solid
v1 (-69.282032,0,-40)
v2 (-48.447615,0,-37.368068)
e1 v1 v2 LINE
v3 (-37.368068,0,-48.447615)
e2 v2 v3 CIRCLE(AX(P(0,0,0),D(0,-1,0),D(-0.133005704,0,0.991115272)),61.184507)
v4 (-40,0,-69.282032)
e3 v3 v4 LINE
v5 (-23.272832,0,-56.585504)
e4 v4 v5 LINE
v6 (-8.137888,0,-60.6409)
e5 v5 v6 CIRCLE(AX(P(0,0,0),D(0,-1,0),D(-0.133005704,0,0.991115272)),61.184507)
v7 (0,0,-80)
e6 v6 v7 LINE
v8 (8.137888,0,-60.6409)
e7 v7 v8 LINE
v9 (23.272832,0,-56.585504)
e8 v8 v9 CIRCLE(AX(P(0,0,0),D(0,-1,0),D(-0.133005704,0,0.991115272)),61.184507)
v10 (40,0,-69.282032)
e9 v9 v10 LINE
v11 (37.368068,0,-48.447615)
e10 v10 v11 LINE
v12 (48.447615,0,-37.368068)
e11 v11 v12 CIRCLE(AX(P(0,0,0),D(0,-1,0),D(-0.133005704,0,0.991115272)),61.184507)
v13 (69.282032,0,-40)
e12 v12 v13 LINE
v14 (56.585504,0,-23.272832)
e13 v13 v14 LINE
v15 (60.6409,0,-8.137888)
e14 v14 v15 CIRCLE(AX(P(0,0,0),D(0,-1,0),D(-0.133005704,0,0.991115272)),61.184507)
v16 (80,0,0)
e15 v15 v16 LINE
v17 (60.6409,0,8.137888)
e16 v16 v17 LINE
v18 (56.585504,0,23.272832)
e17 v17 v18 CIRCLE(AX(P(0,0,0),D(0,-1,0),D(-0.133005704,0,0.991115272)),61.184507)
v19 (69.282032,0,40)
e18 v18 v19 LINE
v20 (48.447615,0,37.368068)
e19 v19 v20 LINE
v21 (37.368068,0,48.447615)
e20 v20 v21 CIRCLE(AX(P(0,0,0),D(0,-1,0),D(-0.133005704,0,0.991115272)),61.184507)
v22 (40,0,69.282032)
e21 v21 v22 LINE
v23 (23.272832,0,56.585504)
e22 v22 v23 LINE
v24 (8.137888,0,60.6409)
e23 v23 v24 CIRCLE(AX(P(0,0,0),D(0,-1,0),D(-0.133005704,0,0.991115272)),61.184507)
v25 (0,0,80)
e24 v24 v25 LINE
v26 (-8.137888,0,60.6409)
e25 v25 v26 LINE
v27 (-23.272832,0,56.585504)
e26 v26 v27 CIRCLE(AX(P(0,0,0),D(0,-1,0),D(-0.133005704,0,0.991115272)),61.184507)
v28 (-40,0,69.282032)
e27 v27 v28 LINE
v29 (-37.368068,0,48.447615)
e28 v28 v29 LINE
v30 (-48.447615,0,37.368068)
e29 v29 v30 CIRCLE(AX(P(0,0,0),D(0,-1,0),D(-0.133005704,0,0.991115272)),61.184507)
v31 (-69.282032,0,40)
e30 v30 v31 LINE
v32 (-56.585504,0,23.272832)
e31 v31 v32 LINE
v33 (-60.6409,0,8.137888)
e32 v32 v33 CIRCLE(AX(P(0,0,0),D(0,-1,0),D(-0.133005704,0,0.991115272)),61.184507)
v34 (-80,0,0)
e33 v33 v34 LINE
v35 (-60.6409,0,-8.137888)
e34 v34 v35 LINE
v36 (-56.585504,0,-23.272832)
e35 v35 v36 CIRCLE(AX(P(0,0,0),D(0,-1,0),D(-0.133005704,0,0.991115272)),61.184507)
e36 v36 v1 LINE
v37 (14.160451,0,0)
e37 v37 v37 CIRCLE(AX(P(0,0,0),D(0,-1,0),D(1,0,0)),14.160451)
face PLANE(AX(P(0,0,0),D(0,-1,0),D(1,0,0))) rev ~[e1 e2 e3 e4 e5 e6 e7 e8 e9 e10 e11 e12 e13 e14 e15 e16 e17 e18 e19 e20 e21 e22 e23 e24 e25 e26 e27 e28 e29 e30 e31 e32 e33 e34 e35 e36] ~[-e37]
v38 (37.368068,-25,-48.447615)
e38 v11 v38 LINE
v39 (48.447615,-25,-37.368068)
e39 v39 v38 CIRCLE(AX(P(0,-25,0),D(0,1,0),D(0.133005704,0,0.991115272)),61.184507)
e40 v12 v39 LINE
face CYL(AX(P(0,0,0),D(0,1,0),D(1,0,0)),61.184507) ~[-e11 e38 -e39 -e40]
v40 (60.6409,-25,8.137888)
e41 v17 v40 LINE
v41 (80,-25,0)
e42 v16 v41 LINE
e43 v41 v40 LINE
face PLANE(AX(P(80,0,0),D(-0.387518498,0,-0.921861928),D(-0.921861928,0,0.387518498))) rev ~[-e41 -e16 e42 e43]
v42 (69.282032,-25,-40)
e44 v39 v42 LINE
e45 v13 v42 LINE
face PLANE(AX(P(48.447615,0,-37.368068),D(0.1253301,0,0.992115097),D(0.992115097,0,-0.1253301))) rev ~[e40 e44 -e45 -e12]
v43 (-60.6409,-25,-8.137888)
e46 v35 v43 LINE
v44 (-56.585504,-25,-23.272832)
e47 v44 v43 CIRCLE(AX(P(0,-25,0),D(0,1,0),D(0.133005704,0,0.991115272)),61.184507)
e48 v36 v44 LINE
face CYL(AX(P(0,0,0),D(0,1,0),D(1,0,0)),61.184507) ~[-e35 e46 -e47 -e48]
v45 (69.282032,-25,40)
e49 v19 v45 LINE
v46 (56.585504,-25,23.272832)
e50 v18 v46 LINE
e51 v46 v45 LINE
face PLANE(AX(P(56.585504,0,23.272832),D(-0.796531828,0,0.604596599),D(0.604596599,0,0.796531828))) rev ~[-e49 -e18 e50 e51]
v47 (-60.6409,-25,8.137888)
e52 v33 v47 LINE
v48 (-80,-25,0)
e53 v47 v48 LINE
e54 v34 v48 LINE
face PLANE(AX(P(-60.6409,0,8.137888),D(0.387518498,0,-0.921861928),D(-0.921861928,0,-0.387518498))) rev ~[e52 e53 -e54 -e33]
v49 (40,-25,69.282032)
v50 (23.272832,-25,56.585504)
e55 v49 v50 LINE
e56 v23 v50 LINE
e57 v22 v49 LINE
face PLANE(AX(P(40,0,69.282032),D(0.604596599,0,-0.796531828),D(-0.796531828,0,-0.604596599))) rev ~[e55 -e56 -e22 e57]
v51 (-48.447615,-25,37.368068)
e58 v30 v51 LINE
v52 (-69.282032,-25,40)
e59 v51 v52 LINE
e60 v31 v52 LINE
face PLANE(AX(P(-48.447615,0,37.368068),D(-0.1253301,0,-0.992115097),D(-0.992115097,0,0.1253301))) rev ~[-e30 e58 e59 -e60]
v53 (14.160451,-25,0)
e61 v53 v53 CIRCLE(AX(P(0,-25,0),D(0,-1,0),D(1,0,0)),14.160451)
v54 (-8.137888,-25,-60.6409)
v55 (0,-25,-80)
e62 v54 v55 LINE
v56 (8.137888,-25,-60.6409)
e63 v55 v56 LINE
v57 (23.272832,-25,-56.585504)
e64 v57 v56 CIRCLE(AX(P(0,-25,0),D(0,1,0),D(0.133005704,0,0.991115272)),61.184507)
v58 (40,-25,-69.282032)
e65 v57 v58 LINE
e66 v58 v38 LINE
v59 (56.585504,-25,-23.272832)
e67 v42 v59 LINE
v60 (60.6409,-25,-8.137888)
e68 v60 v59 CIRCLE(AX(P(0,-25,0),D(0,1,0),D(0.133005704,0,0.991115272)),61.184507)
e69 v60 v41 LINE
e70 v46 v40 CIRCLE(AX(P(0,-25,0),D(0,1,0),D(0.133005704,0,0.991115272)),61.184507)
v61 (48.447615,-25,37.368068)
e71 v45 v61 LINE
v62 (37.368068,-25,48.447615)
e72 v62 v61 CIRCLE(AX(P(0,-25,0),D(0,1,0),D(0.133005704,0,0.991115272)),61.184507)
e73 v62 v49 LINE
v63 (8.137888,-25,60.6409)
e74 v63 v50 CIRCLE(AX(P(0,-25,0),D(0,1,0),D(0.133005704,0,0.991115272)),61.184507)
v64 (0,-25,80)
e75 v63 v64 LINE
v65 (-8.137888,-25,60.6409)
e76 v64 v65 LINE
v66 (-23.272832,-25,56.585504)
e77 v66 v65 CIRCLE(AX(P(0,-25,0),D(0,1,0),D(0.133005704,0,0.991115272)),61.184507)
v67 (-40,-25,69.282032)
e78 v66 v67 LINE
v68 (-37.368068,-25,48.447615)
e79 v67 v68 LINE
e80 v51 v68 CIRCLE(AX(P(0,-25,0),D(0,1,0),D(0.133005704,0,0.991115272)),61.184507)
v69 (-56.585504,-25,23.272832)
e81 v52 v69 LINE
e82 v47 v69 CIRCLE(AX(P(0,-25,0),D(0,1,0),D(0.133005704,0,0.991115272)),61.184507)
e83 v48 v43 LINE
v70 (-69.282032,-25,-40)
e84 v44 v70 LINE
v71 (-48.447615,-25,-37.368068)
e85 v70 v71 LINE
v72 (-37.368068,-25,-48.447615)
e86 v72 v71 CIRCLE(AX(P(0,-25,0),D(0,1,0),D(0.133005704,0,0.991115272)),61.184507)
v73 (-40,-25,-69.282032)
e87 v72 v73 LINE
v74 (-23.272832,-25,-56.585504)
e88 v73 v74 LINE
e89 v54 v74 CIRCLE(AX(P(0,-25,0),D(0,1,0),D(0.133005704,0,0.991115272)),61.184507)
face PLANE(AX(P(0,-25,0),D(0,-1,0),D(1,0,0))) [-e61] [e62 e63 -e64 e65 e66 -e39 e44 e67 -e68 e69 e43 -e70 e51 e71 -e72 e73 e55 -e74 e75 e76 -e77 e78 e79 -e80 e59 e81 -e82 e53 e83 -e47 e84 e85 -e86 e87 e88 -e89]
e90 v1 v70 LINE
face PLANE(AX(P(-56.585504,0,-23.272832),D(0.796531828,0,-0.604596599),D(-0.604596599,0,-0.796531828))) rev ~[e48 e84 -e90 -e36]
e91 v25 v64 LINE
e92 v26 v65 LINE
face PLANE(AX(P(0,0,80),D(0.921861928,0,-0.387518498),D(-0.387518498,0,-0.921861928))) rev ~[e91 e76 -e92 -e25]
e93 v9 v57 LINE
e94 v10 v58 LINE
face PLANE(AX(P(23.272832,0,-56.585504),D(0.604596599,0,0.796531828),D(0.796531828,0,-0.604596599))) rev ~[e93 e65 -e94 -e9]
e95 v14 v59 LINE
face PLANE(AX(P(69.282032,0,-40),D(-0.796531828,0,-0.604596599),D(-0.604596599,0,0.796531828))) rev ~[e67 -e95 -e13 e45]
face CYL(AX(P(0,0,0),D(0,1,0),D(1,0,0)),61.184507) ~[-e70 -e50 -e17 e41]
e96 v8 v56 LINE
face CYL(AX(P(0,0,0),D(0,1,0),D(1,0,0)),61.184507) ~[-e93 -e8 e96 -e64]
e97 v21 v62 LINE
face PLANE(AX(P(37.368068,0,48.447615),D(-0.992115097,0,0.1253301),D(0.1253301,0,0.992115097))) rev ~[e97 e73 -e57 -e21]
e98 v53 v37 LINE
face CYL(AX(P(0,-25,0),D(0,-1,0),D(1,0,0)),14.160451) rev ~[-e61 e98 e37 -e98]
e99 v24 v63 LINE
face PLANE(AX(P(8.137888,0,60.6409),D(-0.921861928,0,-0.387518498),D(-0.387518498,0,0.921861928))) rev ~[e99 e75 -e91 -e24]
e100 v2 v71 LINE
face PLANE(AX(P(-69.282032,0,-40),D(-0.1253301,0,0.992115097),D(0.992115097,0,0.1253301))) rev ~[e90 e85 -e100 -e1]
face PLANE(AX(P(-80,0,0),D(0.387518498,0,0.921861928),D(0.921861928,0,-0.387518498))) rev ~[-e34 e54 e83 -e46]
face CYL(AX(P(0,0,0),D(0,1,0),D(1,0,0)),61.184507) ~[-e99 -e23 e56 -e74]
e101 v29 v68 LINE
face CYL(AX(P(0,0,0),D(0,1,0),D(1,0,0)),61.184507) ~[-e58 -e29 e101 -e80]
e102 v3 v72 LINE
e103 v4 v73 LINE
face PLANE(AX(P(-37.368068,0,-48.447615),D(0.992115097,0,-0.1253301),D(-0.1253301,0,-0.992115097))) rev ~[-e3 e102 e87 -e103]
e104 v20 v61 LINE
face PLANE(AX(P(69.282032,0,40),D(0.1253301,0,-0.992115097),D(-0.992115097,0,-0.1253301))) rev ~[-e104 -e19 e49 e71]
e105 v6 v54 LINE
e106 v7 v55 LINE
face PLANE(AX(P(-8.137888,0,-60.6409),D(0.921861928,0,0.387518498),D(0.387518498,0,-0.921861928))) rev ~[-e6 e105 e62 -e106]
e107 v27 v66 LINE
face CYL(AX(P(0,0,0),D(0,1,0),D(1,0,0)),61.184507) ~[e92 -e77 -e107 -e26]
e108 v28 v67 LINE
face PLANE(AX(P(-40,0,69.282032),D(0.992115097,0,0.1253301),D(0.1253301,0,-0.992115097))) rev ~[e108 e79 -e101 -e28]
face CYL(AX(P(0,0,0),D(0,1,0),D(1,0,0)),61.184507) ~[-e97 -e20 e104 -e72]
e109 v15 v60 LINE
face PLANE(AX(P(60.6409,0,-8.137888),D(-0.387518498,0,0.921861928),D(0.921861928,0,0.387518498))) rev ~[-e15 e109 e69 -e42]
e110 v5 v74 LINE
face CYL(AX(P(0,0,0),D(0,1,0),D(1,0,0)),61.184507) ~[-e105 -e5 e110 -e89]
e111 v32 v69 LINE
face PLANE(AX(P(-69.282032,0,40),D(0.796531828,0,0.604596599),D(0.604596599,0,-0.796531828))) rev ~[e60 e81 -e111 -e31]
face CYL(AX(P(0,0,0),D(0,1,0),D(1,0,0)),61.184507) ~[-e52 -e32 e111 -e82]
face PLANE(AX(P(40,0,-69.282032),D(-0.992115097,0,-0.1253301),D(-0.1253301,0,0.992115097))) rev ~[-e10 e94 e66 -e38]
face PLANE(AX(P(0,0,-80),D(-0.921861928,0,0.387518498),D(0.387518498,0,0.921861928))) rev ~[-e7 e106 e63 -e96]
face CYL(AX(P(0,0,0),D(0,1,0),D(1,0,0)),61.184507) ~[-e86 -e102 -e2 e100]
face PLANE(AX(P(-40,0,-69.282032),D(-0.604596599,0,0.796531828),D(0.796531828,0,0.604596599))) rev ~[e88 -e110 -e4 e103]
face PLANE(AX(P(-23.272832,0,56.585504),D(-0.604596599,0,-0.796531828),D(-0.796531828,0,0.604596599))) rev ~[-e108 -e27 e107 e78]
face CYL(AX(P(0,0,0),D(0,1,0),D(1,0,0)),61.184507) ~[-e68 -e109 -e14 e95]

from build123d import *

# Parameters (mm, degrees)
F0_R            = 61.184507213
F1_DEPTH        = 25
F2_R            = 14.1604507034
F3_DEPTH        = 25
F5_DEPTH        = 25
F5_COPIES_COUNT = 12


# Not quite as in the source:
# - a pattern or mirror of a feature is missing from the dataset's text; its kind, count and spacing are read off the source's solid


with BuildPart() as f1:
    # F0 (on Front) → F1 (new body)
    with BuildSketch(Plane.XZ):
        Circle(F0_R)
    extrude(amount=F1_DEPTH)

    # F2 (on face) → F3 (cut)
    with BuildSketch(Plane.XZ.offset(25)):
        Circle(F2_R)
    extrude(amount=-F3_DEPTH, mode=Mode.SUBTRACT)

    # F4 (on Front) → F5 (join)
    with BuildSketch(Plane.XZ):
        with BuildLine():
            Line((0, 80), (-8.1378884566, 60.6408995181))
            ThreePointArc((-8.1378884566, 60.6408995181), (0, 61.184507213), (8.1378884566, 60.6408995181))
            Line((8.1378884566, 60.6408995181), (0, 80))
        make_face()
    f5 = extrude(amount=F5_DEPTH)

    # F5_copies: F5 ×12 about axis
    f5_copies_axis = Axis((0, 0, 0), (0, 1, 0))
    for i in range(1, F5_COPIES_COUNT):
        add(f5.rotate(f5_copies_axis, i * 360 / F5_COPIES_COUNT))


solid = f1.part
